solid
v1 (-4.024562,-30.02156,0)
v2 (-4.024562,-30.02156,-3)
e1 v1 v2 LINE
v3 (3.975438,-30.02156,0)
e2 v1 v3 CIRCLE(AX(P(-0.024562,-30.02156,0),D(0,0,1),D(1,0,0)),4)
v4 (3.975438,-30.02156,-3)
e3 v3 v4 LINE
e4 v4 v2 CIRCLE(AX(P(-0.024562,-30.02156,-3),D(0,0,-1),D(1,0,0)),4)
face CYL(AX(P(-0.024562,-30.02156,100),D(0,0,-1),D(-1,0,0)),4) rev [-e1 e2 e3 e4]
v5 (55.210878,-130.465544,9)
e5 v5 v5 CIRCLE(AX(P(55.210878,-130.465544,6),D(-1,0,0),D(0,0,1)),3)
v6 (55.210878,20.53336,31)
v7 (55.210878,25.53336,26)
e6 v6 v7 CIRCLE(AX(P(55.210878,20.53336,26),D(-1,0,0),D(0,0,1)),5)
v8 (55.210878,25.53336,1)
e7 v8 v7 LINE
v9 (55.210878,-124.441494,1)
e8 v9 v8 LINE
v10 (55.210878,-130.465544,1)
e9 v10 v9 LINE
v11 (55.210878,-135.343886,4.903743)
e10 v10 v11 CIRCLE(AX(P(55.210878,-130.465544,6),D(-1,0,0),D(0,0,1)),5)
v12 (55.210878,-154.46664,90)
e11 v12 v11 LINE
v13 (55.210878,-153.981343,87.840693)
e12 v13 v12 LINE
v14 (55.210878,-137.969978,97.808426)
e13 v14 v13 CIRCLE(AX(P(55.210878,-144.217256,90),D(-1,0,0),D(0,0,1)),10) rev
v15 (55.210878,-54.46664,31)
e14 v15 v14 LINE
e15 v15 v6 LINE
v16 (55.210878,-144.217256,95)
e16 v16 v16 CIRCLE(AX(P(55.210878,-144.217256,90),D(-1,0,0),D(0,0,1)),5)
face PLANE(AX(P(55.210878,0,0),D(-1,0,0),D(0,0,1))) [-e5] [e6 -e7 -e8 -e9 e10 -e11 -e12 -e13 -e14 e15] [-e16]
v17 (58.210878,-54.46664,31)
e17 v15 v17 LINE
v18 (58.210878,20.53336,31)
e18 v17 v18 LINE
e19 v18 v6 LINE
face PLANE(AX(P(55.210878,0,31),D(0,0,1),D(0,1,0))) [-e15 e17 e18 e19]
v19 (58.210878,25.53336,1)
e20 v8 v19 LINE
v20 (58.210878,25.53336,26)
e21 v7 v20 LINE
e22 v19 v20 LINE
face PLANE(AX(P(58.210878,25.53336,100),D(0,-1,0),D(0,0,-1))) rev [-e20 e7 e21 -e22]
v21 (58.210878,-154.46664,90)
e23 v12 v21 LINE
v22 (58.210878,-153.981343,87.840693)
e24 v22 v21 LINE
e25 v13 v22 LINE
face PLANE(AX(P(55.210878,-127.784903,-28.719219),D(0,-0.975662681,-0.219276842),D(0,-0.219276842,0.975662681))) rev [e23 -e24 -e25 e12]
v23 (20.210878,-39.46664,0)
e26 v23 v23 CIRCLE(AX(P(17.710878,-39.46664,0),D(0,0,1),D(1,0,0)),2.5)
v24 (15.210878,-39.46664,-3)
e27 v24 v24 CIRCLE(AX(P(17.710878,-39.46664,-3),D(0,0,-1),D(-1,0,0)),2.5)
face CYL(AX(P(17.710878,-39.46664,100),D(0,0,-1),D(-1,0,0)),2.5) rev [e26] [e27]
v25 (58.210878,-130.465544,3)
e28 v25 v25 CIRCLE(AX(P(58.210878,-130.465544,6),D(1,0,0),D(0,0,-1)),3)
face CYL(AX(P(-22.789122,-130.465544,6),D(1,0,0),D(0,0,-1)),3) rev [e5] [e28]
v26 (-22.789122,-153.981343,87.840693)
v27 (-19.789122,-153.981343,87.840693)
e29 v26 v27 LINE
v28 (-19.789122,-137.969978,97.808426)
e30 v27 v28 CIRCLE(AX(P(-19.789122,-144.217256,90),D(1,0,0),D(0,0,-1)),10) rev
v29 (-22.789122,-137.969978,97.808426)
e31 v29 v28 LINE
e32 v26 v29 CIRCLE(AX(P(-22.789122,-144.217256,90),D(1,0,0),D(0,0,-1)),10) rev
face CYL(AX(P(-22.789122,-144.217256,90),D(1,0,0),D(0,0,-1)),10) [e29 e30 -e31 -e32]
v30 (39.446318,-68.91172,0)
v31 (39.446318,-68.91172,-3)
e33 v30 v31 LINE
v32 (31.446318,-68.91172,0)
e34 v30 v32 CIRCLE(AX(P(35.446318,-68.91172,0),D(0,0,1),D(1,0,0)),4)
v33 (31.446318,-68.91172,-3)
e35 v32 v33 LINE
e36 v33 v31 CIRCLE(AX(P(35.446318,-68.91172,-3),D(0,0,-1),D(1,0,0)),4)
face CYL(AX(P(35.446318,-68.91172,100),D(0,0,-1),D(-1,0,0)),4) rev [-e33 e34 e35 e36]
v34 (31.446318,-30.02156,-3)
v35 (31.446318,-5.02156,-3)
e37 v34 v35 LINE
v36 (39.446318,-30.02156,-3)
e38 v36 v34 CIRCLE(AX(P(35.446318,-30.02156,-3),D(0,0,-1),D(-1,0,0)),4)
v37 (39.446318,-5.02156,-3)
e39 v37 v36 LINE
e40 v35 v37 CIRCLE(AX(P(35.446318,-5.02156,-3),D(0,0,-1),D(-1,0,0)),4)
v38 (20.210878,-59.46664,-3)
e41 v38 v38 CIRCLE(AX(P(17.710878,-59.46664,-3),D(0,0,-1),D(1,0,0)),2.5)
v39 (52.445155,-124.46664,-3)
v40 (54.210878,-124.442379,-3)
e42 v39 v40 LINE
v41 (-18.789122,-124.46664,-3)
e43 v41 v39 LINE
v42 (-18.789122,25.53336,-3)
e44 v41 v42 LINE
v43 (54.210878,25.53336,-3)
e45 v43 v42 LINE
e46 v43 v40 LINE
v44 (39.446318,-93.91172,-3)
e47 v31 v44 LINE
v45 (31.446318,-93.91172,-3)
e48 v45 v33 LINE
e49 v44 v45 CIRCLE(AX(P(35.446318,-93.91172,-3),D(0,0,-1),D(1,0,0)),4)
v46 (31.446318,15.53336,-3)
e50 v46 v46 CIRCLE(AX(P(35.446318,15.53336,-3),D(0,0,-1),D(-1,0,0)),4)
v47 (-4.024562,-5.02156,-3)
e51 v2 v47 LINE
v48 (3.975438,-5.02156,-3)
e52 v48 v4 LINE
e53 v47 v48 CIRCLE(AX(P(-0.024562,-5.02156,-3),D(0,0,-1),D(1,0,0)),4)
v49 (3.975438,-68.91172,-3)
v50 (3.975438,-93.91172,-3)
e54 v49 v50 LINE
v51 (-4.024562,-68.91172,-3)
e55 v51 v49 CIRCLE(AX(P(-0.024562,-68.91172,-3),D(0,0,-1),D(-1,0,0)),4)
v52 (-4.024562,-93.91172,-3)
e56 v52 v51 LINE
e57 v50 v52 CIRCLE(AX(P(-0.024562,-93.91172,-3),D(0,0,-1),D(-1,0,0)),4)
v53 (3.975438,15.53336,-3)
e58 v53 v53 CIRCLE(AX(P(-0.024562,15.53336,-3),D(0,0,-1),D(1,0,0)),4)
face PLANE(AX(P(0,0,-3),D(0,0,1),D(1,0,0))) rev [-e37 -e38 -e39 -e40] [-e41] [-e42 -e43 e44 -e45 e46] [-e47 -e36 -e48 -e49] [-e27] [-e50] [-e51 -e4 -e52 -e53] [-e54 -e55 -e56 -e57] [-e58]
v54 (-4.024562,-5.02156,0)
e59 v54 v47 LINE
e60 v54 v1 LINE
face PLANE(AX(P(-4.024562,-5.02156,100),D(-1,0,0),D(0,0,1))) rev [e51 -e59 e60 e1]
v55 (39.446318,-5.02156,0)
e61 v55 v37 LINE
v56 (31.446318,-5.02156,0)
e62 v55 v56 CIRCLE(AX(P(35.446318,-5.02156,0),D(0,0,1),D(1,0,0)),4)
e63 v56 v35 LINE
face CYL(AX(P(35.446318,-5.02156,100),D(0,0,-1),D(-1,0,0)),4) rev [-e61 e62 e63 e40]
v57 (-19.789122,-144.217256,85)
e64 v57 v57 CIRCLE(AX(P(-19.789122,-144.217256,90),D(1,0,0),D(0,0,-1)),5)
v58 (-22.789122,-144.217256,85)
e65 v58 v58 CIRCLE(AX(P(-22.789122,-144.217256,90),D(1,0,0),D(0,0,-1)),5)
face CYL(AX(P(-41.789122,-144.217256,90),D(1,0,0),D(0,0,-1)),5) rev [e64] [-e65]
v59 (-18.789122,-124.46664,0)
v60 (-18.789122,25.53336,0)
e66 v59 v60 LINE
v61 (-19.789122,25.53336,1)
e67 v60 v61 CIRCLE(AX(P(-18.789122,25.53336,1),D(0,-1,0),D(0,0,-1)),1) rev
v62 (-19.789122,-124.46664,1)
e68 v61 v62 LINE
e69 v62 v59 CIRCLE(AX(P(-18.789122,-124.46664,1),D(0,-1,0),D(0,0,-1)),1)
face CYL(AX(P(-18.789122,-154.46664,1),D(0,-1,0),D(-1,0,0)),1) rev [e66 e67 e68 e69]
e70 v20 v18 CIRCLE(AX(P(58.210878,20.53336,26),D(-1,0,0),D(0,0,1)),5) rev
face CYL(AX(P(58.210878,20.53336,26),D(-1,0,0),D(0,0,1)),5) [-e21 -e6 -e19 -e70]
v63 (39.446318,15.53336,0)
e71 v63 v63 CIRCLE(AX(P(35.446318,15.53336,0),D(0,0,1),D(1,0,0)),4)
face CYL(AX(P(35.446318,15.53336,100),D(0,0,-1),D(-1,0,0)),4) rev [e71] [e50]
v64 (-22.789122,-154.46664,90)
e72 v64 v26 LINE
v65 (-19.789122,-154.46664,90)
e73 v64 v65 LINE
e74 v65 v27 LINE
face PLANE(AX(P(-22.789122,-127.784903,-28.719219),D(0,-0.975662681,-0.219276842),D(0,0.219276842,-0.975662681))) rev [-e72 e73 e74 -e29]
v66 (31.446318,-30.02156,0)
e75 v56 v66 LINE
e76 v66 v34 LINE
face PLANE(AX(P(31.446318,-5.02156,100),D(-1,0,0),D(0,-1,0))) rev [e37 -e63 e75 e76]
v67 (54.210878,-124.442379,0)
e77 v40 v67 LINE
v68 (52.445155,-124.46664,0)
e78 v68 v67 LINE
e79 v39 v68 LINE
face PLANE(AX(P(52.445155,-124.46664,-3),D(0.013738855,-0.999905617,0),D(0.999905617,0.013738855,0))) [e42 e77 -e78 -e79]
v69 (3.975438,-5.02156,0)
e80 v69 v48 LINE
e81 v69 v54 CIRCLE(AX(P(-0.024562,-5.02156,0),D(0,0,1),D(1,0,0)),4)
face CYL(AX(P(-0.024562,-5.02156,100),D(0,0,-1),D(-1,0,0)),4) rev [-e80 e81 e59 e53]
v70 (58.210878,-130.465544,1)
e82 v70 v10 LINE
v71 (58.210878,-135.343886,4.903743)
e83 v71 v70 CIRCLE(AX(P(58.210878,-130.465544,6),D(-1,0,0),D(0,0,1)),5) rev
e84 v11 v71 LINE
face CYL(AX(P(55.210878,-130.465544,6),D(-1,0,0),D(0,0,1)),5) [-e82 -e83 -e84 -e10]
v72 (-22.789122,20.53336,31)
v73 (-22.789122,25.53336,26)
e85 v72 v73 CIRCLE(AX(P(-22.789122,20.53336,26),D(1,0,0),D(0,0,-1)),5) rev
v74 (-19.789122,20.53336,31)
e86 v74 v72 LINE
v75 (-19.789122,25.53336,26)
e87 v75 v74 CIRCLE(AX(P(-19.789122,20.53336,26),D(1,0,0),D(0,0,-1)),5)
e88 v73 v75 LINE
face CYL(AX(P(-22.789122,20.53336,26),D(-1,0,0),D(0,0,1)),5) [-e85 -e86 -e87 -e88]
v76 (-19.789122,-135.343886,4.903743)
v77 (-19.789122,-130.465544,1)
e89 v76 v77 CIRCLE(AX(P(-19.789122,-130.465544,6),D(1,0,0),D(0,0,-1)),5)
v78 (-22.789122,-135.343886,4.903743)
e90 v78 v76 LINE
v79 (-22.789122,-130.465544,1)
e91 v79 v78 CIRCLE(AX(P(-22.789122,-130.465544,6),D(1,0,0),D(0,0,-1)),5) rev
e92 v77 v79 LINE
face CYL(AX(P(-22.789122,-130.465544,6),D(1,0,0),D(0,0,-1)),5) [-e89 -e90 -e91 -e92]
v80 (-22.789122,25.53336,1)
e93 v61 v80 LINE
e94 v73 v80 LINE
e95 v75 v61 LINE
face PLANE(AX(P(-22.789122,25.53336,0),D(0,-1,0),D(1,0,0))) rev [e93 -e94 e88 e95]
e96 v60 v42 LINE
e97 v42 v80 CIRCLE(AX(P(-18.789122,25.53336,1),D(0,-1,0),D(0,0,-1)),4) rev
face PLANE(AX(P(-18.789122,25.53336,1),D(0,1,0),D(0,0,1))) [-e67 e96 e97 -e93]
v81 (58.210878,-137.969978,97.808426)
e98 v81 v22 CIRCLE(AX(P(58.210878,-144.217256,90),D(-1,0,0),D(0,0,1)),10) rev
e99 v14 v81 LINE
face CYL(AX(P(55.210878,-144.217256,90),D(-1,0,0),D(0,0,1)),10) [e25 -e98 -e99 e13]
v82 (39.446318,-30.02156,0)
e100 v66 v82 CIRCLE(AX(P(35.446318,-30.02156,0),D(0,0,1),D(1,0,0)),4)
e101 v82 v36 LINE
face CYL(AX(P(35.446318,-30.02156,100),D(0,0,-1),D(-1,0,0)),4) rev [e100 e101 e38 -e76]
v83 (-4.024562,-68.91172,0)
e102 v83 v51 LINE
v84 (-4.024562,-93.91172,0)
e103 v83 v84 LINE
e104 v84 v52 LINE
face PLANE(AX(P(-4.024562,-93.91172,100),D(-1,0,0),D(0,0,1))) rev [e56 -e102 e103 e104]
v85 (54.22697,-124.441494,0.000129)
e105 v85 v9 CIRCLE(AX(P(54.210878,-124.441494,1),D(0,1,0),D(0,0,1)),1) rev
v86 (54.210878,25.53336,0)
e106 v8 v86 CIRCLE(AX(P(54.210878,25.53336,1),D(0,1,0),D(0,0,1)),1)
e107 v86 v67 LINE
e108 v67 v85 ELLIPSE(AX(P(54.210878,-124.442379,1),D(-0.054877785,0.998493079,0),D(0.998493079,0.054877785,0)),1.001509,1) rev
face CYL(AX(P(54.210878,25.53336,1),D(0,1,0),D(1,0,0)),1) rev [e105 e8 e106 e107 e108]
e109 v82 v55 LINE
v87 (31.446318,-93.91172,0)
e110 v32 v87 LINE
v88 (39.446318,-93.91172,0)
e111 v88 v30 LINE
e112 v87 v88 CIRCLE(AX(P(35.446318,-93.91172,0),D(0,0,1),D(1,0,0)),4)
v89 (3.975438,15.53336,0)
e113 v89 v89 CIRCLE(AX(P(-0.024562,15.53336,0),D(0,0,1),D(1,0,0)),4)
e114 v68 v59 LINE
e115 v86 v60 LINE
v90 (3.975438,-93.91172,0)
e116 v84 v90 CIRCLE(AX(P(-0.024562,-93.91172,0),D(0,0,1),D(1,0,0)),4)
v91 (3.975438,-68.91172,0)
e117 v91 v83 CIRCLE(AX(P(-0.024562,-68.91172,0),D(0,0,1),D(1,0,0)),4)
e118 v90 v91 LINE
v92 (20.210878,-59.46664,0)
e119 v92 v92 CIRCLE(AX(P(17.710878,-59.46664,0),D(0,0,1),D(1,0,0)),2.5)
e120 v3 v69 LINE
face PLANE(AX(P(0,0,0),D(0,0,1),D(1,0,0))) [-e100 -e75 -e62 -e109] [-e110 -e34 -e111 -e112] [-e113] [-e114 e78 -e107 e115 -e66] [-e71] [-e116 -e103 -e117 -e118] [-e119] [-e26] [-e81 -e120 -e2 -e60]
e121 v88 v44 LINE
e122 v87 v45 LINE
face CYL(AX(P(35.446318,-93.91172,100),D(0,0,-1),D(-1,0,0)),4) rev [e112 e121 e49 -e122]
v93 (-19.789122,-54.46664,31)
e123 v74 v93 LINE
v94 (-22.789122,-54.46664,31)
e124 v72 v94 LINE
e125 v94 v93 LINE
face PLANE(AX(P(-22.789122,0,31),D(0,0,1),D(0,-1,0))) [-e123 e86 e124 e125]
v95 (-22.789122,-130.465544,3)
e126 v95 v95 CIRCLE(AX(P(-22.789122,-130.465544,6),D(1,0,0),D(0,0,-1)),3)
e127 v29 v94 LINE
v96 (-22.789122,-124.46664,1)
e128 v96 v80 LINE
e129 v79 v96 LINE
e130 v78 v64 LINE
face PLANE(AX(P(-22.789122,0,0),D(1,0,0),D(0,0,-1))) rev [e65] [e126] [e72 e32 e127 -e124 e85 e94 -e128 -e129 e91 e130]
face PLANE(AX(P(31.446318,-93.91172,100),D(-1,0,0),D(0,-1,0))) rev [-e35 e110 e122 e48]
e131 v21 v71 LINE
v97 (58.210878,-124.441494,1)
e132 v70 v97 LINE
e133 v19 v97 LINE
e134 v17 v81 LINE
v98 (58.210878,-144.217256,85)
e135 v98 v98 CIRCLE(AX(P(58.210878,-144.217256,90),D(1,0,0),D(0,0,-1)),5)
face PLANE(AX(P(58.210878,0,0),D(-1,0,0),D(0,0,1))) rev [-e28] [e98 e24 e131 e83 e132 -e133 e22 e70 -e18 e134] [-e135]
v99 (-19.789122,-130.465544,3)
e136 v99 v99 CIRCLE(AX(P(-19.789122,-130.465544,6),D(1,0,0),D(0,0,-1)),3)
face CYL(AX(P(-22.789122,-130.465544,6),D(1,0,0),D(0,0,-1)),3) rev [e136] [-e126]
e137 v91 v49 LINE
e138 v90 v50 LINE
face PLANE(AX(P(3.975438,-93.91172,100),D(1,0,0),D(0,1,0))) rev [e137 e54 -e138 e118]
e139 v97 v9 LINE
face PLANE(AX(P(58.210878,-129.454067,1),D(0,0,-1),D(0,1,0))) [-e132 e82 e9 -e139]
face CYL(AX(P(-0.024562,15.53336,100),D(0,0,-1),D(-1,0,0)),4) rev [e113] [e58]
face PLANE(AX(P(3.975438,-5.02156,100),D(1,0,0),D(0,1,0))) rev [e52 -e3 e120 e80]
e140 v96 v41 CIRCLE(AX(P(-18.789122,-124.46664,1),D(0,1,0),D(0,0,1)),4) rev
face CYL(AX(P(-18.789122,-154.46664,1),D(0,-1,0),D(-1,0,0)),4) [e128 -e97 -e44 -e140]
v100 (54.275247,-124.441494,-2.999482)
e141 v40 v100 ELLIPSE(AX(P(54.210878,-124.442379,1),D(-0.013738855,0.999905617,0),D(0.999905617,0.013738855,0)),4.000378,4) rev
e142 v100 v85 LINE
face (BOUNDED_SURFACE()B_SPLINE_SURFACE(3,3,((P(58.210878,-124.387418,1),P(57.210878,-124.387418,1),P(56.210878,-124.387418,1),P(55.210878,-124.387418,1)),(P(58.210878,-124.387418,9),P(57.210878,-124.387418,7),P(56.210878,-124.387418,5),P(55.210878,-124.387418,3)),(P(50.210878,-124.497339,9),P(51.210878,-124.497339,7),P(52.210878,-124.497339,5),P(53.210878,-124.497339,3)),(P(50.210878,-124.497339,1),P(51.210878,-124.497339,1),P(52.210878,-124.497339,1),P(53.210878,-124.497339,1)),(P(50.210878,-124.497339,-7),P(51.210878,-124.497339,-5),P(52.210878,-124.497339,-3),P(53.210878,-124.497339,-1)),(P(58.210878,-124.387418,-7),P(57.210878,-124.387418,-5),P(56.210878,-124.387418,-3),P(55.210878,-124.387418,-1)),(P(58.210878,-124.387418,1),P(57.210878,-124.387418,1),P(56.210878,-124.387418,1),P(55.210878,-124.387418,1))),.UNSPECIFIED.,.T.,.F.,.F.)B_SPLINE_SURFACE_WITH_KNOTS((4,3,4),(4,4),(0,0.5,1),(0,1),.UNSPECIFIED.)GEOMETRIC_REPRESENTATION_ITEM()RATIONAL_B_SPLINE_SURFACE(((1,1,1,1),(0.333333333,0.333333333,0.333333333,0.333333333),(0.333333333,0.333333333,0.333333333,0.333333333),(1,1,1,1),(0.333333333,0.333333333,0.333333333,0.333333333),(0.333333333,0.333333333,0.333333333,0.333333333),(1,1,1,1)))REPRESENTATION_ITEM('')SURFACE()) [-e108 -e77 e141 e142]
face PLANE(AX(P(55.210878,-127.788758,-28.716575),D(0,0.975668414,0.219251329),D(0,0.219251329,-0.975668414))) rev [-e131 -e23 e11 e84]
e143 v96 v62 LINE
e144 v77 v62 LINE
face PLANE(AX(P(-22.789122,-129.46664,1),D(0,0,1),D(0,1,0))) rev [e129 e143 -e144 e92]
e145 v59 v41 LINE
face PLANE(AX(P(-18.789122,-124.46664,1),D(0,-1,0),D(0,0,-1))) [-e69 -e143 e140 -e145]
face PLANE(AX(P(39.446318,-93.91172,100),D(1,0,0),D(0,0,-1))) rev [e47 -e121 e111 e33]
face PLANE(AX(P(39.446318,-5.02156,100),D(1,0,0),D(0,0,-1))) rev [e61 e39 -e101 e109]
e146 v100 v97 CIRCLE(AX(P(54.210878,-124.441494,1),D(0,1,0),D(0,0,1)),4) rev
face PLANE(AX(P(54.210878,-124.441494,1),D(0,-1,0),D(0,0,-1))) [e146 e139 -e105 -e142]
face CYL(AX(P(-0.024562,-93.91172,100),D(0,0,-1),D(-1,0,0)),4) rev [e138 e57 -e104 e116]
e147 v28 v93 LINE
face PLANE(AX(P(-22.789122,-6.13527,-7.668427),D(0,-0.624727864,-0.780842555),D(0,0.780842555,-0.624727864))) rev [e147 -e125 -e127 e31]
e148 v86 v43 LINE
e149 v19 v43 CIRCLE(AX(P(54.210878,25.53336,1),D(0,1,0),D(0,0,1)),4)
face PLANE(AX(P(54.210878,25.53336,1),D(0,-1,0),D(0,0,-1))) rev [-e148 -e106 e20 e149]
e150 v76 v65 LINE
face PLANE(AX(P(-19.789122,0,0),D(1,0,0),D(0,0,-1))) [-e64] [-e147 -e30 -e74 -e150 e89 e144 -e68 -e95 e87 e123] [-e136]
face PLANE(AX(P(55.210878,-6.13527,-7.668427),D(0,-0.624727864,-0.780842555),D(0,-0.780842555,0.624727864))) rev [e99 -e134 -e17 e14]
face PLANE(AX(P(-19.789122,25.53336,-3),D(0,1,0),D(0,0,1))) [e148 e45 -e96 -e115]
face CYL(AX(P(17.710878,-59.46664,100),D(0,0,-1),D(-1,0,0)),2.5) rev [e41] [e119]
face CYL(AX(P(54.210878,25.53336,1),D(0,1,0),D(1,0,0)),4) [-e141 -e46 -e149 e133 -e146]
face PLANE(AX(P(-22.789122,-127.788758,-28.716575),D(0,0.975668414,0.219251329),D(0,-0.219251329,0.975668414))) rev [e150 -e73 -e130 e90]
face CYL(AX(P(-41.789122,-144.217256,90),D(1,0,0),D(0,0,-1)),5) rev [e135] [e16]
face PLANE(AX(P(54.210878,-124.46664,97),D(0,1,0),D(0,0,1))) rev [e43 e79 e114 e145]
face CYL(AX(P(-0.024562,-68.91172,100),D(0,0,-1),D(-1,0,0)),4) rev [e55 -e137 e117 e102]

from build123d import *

# Parameters (mm, degrees)
SKETCH_1_W                       = 75
SKETCH_1_H                       = 180
SM_BASE_FLANGE_1_DEPTH           = 3
SM_EDGE_FLANGE_1_STRIP_W         = 14
SM_EDGE_FLANGE_1_STRIP_H         = 3
SM_EDGE_FLANGE_1_STRIP_CUT_DEPTH = 180
SM_EDGE_FLANGE_1_DEPTH           = 180
SM_EDGE_FLANGE_2_STRIP_W         = 14
SM_EDGE_FLANGE_2_STRIP_H         = 3
SM_EDGE_FLANGE_2_STRIP_CUT_DEPTH = 180
SM_EDGE_FLANGE_2_DEPTH           = 180
CUT_EXTRUDE_12_DEPTH             = 305
CUT_EXTRUDE_13_DEPTH             = 100
SKETCH_18_R                      = 5
CUT_EXTRUDE_14_DEPTH             = 100
CUT_EXTRUDE_16_DEPTH             = 100
SKETCH_21_W                      = 73
SKETCH_21_H                      = 30
CUT_EXTRUDE_17_DEPTH             = 100
CUT_EXTRUDE_18_DEPTH             = 4
CUT_EXTRUDE_START                = -4
CUT_EXTRUDE_19_DEPTH             = 4
SKETCH_24_R                      = 4
SKETCH_24_R_2                    = 2.5
CUT_EXTRUDE_20_DEPTH             = 195.569908194
CUT_EXTRUDE_23_DEPTH             = 4
SKETCH_26_W                      = 5.11266932
SKETCH_26_H                      = 10
CUT_EXTRUDE_24_DEPTH             = 4
FILLET_1_R                       = 5
FILLET_2_R                       = 5
FILLET_3_R                       = 5
FILLET_4_R                       = 5
SKETCH_27_R                      = 3
CUT_EXTRUDE_25_DEPTH             = 202.049602951


# Read off the part's stored shape, not the designer's step: 切除-拉伸19
# Sheet-metal steps are written as plain solids
with BuildPart() as part:
    # Sketch 1 → 基体-法兰1 (new body)
    with BuildSketch(Plane.XY):
        with Locations((17.710878089, -64.466639915)):
            Rectangle(SKETCH_1_W, SKETCH_1_H)
    extrude(amount=-SM_BASE_FLANGE_1_DEPTH)

    # 边线-法兰1 strip (across the edge) → 边线-法兰1 strip cut (cut)
    with BuildSketch(Plane(origin=(55.210878089, -154.466639915, 0), x_dir=(-1, 0, 0), z_dir=(0, 1, 0))):
        with Locations((-6, -1.5)):
            Rectangle(SM_EDGE_FLANGE_1_STRIP_W, SM_EDGE_FLANGE_1_STRIP_H)
    extrude(amount=SM_EDGE_FLANGE_1_STRIP_CUT_DEPTH, mode=Mode.SUBTRACT)

    # 边线-法兰1 section (across the edge) → 边线-法兰1 (add)
    with BuildSketch(Plane(origin=(55.210878089, -154.466639915, 0), x_dir=(-1, 0, 0), z_dir=(0, 1, 0))):
        with BuildLine():
            Line((-3, 1), (-3, 100))
            Line((-3, 100), (0, 100))
            Line((0, 100), (0, 1))
            ThreePointArc((0, 1), (0.292893219, 0.292893219), (1, 0))
            Line((1, 0), (1, -3))
            ThreePointArc((1, -3), (-1.828427125, -1.828427125), (-3, 1))
        make_face()
    extrude(amount=SM_EDGE_FLANGE_1_DEPTH)

    # 边线-法兰2 strip (across the edge) → 边线-法兰2 strip cut (cut)
    with BuildSketch(Plane(origin=(-19.789121911, 25.533360085, 0), x_dir=(1, 0, 0), z_dir=(0, -1, 0))):
        with Locations((-6, -1.5)):
            Rectangle(SM_EDGE_FLANGE_2_STRIP_W, SM_EDGE_FLANGE_2_STRIP_H)
    extrude(amount=SM_EDGE_FLANGE_2_STRIP_CUT_DEPTH, mode=Mode.SUBTRACT)

    # 边线-法兰2 section (across the edge) → 边线-法兰2 (add)
    with BuildSketch(Plane(origin=(-19.789121911, 25.533360085, 0), x_dir=(1, 0, 0), z_dir=(0, -1, 0))):
        with BuildLine():
            Line((-3, 1), (-3, 100))
            Line((-3, 100), (0, 100))
            Line((0, 100), (0, 1))
            ThreePointArc((0, 1), (0.292893219, 0.292893219), (1, 0))
            Line((1, 0), (1, -3))
            ThreePointArc((1, -3), (-1.828427125, -1.828427125), (-3, 1))
        make_face()
    extrude(amount=SM_EDGE_FLANGE_2_DEPTH)

    # 草图15 → 切除-拉伸12 (cut)
    with BuildSketch(Plane(origin=(58.210878089, 0, 0), x_dir=(0, 0, -1), z_dir=(1, 0, 0))):
        Polygon((-1, -154.466639915), (-1, -134.466639915), (-90, -154.466639915), align=None)
    extrude(amount=-CUT_EXTRUDE_12_DEPTH, mode=Mode.SUBTRACT)

    # 草图17 → 切除-拉伸13 (cut)
    with BuildSketch(Plane(origin=(58.210878089, 0, 0), x_dir=(0, 0, -1), z_dir=(1, 0, 0))):
        with BuildLine():
            Line((-100, -144.217256156), (-100, -154.466639915))
            Line((-100, -154.466639915), (-90, -154.466639915))
            Line((-90, -154.466639915), (-87.840693161, -153.981343107))
            ThreePointArc((-87.840693161, -153.981343107), (-96.261267109, -152.014469389), (-100, -144.217256156))
        make_face()
    extrude(amount=-CUT_EXTRUDE_13_DEPTH, mode=Mode.SUBTRACT)

    # 草图18 → 切除-拉伸14 (cut)
    with BuildSketch(Plane(origin=(58.210878089, 0, 0), x_dir=(0, 0, -1), z_dir=(1, 0, 0))):
        with Locations((-90, -144.217256156)):
            Circle(SKETCH_18_R)
    extrude(amount=-CUT_EXTRUDE_14_DEPTH, mode=Mode.SUBTRACT)

    # 草图19 → 切除-拉伸16 (cut)
    with BuildSketch(Plane(origin=(58.210878089, 0, 0), x_dir=(0, 0, -1), z_dir=(1, 0, 0))):
        with BuildLine():
            ThreePointArc((-100, -144.217256156), (-99.436213635, -140.906988458), (-97.808425553, -137.969977518))
            Line((-97.808425553, -137.969977518), (-31, -54.466639915))
            Line((-31, -54.466639915), (-31, 25.533360085))
            Line((-31, 25.533360085), (-100, 25.533360085))
            Line((-100, 25.533360085), (-100, -144.217256156))
        make_face()
    extrude(amount=-CUT_EXTRUDE_16_DEPTH, mode=Mode.SUBTRACT)

    # 草图21 → 切除-拉伸17 (cut)
    with BuildSketch(Plane(origin=(0, 0, -3), x_dir=(-1, 0, 0), z_dir=(0, 0, -1))):
        with Locations((-17.710878089, -139.466639915)):
            Rectangle(SKETCH_21_W, SKETCH_21_H)
    extrude(amount=-CUT_EXTRUDE_17_DEPTH, mode=Mode.SUBTRACT)

    # 草图22 → 切除-拉伸18 (cut)
    with BuildSketch(Plane(origin=(0, 0, -3), x_dir=(-1, 0, 0), z_dir=(0, 0, -1))):
        Polygon((-59.141267928, -134.466639915), (-53.468887504, -134.466639915), (-53.468887504, -154.535826818), (-59.141267928, -156.162456052), align=None)
    extrude(amount=-CUT_EXTRUDE_18_DEPTH, mode=Mode.SUBTRACT)

    # 切除-拉伸19 outline → 切除-拉伸19 (cut)
    with BuildSketch(Plane(origin=(-18.789121911, 0, 0), x_dir=(0, 0, -1), z_dir=(1, 0, 0)).offset(CUT_EXTRUDE_START)):
        Polygon((3, -154.466639915), (4.115118774, -134.466639915), (-1, -134.466639915), (-1, -154.466639915), align=None)
    extrude(amount=CUT_EXTRUDE_19_DEPTH, mode=Mode.SUBTRACT)

    # 草图24 → 切除-拉伸20 (cut, through all)
    with BuildSketch(Plane(origin=(0, 0, -3), x_dir=(-1, 0, 0), z_dir=(0, 0, -1))):
        with Locations((-35.446317978, 15.533360085)):
            Circle(SKETCH_24_R)
        with Locations(Location((0.0245618, 15.533360085, 0), (0, 0, 180))):
            Circle(SKETCH_24_R)
        with Locations((-17.710878089, -39.466639915)):
            Circle(SKETCH_24_R_2)
        with Locations(Location((-17.710878089, -59.466639915, 0), (0, 0, 180))):
            Circle(SKETCH_24_R_2)
        with BuildLine():
            Line((-31.446317978, -5.021559832), (-31.446317978, -30.021559832))
            ThreePointArc((-31.446317978, -30.021559832), (-35.446317978, -34.021559832), (-39.446317978, -30.021559832))
            Line((-39.446317978, -30.021559832), (-39.446317978, -5.021559832))
            ThreePointArc((-39.446317978, -5.021559832), (-35.446317978, -1.021559832), (-31.446317978, -5.021559832))
        make_face()
        with BuildLine():
            Line((-3.9754382, -5.021559832), (-3.9754382, -30.021559832))
            ThreePointArc((-3.9754382, -30.021559832), (0.0245618, -34.021559832), (4.0245618, -30.021559832))
            Line((4.0245618, -30.021559832), (4.0245618, -5.021559832))
            ThreePointArc((4.0245618, -5.021559832), (0.0245618, -1.021559832), (-3.9754382, -5.021559832))
        make_face()
        with BuildLine():
            Line((-31.446317978, -93.911719998), (-31.446317978, -68.911719998))
            ThreePointArc((-31.446317978, -68.911719998), (-35.446317978, -64.911719998), (-39.446317978, -68.911719998))
            Line((-39.446317978, -68.911719998), (-39.446317978, -93.911719998))
            ThreePointArc((-39.446317978, -93.911719998), (-35.446317978, -97.911719998), (-31.446317978, -93.911719998))
        make_face()
        with BuildLine():
            Line((-3.9754382, -93.911719998), (-3.9754382, -68.911719998))
            ThreePointArc((-3.9754382, -68.911719998), (0.0245618, -64.911719998), (4.0245618, -68.911719998))
            Line((4.0245618, -68.911719998), (4.0245618, -93.911719998))
            ThreePointArc((4.0245618, -93.911719998), (0.0245618, -97.911719998), (-3.9754382, -93.911719998))
        make_face()
    extrude(amount=-CUT_EXTRUDE_20_DEPTH, mode=Mode.SUBTRACT)

    # 草图25 → 切除-拉伸23 (cut)
    with BuildSketch(Plane(origin=(0, 0, -3), x_dir=(-1, 0, 0), z_dir=(0, 0, -1))):
        Polygon((-54.27524735, -124.441494169), (-58.427773386, -124.441494169), (-58.210878089, -134.466639915), (-55.210878089, -134.466639915), (-54.27524735, -134.466639915), (-52.445155018, -134.466639915), (-52.445155018, -124.466639915), align=None)
    extrude(amount=-CUT_EXTRUDE_23_DEPTH, mode=Mode.SUBTRACT)

    # 草图26 → 切除-拉伸24 (cut)
    with BuildSketch(Plane(origin=(0, 0, -3), x_dir=(-1, 0, 0), z_dir=(0, 0, -1))):
        with Locations((21.345456571, -129.466639915)):
            Rectangle(SKETCH_26_W, SKETCH_26_H)
    extrude(amount=-CUT_EXTRUDE_24_DEPTH, mode=Mode.SUBTRACT)

    # 圆角1
    fillet_1_edges = [part.edges().sort_by_distance(p)[0] for p in [
        (56.710878089, -134.466639915, 1),
    ]]
    fillet(fillet_1_edges, radius=FILLET_1_R)

    # 圆角2
    fillet_2_edges = [part.edges().sort_by_distance(p)[0] for p in [
        (-21.289121911, -134.466639915, 1),
    ]]
    fillet(fillet_2_edges, radius=FILLET_2_R)

    # 圆角3
    fillet_3_edges = [part.edges().sort_by_distance(p)[0] for p in [
        (56.710878089, 25.533360085, 31),
    ]]
    fillet(fillet_3_edges, radius=FILLET_3_R)

    # 圆角4
    fillet_4_edges = [part.edges().sort_by_distance(p)[0] for p in [
        (-21.289121911, 25.533360085, 31),
    ]]
    fillet(fillet_4_edges, radius=FILLET_4_R)

    # 草图27 → 切除-拉伸25 (cut, through all)
    with BuildSketch(Plane(origin=(58.210878089, 0, 0), x_dir=(0, 0, -1), z_dir=(1, 0, 0))):
        with Locations((-6, -130.465543541)):
            Circle(SKETCH_27_R)
    extrude(amount=-CUT_EXTRUDE_25_DEPTH, mode=Mode.SUBTRACT)


solid = part.part
